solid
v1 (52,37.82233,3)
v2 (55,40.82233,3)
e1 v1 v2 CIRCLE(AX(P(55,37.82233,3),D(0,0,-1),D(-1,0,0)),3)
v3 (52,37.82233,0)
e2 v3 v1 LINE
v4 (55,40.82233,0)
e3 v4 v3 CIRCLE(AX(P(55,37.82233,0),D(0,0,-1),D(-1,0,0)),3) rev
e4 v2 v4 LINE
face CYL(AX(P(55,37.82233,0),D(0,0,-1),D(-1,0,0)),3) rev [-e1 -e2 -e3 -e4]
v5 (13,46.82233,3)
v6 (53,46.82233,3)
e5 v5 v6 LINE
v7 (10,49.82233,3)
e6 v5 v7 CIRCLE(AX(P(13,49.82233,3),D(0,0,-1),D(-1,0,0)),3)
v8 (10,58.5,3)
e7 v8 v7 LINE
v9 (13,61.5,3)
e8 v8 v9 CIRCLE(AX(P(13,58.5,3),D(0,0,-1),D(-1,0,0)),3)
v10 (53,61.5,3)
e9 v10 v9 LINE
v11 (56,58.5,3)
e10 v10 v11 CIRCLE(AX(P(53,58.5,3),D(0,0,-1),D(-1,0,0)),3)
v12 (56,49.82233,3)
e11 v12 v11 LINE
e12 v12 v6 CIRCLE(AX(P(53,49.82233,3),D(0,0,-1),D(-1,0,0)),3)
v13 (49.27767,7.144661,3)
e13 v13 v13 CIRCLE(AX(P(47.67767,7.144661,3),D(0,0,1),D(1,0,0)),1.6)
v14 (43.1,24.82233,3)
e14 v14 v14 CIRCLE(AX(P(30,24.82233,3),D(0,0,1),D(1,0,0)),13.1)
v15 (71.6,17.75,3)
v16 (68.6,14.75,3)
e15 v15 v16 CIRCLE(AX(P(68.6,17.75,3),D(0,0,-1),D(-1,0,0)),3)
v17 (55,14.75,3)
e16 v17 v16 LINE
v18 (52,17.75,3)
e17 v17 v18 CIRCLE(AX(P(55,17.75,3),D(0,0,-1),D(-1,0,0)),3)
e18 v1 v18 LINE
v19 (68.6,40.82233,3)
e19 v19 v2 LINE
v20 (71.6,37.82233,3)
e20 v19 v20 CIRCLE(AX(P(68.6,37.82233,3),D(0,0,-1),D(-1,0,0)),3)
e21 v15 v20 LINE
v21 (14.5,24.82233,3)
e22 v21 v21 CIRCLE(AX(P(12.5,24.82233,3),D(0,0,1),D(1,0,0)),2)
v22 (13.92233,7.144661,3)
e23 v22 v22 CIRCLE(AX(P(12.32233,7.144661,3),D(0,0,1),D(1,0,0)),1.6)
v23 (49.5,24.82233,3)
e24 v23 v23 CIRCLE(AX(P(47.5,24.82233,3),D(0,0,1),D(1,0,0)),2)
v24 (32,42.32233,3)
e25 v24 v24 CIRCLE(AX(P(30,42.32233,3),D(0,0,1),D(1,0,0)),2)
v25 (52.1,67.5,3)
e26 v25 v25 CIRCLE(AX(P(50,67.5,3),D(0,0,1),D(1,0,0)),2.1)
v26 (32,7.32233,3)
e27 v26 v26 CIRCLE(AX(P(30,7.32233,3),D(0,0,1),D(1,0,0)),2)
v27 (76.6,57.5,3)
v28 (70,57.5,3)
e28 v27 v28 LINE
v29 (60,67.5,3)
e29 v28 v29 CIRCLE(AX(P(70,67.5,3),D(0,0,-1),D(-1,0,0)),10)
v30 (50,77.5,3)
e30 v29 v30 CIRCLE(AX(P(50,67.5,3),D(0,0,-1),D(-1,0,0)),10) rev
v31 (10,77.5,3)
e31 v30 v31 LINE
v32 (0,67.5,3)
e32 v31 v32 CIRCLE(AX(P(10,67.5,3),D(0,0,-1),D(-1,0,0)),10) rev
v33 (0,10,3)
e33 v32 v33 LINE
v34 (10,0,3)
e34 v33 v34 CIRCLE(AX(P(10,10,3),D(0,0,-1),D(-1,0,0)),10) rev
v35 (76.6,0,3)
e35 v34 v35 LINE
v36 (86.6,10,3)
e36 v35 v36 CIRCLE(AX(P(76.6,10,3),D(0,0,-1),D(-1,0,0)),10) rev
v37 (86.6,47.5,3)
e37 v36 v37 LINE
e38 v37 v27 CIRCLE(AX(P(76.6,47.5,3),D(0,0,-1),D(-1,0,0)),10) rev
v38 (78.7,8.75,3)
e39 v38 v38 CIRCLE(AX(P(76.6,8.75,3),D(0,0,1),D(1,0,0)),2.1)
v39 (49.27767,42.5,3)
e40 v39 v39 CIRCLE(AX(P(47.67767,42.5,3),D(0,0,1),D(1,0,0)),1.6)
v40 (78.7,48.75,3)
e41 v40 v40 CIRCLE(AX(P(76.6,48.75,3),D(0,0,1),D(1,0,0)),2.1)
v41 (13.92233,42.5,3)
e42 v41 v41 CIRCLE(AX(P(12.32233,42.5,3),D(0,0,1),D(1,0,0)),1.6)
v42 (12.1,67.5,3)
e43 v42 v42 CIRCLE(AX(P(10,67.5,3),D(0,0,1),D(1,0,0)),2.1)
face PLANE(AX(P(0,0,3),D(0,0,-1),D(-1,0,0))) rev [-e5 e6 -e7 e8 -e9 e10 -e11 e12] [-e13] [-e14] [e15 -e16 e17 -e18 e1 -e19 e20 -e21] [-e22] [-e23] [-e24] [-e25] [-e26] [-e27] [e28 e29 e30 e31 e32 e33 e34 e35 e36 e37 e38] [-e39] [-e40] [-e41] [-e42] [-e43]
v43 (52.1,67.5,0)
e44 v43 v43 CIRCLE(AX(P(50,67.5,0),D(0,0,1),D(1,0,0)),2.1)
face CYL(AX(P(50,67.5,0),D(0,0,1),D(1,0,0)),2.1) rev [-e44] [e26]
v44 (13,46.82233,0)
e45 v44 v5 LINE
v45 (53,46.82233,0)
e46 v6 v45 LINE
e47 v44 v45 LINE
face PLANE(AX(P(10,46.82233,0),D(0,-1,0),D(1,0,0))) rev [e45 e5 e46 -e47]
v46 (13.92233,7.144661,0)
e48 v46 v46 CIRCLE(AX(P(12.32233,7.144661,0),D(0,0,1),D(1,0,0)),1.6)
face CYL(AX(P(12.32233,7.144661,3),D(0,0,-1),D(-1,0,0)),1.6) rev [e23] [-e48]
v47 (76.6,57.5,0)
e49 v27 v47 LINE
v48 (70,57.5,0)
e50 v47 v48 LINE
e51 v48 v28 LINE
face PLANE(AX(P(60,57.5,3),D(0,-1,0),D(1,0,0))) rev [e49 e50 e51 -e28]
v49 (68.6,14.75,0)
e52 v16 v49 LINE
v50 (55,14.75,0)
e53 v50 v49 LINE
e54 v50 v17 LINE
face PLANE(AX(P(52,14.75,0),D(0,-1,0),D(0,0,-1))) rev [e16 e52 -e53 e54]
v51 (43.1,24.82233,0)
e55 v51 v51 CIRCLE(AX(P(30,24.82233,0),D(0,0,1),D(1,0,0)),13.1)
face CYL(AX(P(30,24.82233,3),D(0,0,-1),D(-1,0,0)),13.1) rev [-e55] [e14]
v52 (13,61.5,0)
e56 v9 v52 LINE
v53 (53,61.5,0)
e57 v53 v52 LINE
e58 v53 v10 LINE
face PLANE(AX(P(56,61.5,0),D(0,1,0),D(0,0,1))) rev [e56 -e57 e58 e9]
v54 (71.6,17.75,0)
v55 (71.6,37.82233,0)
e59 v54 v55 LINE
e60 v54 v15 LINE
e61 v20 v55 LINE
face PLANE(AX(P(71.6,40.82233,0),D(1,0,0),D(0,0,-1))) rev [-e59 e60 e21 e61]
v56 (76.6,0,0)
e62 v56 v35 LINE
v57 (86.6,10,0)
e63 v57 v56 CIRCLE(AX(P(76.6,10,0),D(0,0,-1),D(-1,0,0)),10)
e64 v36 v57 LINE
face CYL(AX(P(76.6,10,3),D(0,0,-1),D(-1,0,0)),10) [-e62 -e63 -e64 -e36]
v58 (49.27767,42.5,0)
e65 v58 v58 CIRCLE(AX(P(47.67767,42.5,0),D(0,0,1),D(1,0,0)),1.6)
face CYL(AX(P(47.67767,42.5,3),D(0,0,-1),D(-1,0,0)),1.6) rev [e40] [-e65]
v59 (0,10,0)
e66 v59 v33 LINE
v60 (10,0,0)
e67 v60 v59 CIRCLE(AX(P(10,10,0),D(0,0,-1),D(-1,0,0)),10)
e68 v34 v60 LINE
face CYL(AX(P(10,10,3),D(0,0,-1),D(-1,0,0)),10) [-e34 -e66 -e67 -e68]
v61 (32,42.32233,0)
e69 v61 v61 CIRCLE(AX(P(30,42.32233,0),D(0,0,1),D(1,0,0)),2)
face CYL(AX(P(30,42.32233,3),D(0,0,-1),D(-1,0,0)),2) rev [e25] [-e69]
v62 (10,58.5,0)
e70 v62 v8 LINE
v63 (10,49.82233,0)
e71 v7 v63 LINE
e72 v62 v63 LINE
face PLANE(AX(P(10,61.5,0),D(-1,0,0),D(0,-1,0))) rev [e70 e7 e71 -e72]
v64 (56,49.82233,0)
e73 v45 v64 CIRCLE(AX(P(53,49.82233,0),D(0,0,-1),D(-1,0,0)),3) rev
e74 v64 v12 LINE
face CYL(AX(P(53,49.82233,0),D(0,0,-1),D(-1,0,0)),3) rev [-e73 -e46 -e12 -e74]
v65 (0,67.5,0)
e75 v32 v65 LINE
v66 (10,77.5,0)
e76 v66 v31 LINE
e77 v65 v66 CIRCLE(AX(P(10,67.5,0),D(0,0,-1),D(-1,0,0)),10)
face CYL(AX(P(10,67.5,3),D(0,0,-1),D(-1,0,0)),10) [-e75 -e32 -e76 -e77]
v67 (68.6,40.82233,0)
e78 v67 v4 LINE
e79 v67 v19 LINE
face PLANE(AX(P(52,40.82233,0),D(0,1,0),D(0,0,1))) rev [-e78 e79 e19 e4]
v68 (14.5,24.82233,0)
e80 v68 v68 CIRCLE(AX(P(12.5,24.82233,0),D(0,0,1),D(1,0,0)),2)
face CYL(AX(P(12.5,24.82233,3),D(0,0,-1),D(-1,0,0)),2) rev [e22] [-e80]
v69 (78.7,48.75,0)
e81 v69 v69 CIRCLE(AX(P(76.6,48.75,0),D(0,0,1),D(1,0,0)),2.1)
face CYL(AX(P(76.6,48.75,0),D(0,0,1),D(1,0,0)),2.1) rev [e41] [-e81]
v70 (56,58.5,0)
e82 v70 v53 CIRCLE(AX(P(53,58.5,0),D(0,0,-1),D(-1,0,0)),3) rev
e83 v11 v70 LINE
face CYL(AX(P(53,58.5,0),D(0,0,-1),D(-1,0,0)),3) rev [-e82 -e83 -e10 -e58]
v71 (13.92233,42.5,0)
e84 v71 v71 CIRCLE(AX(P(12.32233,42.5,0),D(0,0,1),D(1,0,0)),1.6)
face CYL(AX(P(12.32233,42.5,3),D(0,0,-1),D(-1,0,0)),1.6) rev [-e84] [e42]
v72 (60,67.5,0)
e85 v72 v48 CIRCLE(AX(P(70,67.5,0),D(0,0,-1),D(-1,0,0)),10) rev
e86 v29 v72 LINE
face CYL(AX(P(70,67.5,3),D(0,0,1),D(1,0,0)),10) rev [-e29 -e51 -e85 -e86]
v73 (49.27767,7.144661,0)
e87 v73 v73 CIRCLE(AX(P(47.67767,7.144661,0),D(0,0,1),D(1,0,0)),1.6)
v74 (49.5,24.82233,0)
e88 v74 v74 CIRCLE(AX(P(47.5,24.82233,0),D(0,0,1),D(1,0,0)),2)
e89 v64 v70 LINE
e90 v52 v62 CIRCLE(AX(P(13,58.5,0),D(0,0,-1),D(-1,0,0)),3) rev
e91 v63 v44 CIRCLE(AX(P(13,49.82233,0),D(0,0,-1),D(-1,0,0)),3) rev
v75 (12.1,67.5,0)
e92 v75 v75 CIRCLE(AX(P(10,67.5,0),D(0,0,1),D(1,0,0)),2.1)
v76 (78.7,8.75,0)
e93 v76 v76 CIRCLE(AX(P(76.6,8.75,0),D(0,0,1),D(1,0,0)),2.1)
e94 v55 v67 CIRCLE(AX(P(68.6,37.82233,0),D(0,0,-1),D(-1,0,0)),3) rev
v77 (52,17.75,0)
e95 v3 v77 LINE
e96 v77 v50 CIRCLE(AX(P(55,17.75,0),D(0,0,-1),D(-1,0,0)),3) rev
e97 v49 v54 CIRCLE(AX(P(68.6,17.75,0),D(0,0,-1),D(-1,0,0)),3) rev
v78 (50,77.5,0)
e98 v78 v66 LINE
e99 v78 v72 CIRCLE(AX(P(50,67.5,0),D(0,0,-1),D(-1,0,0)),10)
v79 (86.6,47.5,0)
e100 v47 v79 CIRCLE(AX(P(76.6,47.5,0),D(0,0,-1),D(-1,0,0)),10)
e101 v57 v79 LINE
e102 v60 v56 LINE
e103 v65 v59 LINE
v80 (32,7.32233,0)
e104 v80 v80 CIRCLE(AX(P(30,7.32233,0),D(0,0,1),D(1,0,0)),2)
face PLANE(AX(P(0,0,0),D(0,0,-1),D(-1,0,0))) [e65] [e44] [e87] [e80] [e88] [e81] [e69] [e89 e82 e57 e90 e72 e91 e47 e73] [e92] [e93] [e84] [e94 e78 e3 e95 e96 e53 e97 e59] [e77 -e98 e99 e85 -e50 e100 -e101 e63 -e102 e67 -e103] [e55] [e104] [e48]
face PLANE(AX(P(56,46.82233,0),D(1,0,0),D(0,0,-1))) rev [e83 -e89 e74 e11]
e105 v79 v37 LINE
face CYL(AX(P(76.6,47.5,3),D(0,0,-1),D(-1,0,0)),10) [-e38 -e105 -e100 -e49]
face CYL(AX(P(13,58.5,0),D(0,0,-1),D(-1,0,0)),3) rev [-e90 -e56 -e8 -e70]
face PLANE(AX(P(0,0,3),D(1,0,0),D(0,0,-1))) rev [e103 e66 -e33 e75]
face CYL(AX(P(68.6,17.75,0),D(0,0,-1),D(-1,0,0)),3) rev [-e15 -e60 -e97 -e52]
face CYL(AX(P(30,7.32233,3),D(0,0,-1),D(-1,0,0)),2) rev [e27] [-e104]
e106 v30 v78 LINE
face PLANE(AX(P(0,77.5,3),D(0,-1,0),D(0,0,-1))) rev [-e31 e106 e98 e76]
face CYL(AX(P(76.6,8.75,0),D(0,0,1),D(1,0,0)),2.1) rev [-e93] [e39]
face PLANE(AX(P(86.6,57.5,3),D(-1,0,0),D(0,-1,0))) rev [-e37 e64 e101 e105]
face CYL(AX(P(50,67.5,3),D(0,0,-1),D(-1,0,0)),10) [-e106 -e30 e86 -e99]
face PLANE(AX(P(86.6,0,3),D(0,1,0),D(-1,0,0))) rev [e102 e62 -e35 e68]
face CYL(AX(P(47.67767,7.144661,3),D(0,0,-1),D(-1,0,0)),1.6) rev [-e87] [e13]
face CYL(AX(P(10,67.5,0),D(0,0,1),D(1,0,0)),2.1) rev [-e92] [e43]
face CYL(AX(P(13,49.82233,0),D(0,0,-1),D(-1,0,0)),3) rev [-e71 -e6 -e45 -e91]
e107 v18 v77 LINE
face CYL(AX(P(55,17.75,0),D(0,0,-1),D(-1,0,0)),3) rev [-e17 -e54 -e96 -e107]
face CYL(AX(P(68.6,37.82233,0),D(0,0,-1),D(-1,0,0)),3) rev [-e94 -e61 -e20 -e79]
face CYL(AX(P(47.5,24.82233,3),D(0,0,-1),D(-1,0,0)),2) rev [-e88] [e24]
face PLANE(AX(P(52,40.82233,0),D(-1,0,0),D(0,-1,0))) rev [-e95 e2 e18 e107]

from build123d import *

# Parameters (mm, degrees)
SKETCH_1_R          = 1.6
SKETCH_1_R_2        = 2
SKETCH_1_R_3        = 13.1
EXTRUDE_1_DEPTH     = 3
SKETCH_2_R          = 2.1
CUT_EXTRUDE_1_DEPTH = 117.253215009
FILLET_1_R          = 10
SKETCH_4_W          = 19.6
SKETCH_4_H          = 26.07233047
SKETCH_4_W_2        = 46
SKETCH_4_H_2        = 14.67766953
CUT_EXTRUDE_2_DEPTH = 117.253215009
FILLET_2_R          = 3


with BuildPart() as part:
    # 草图1 → 凸台-拉伸1 (new body)
    with BuildSketch(Plane.XY):
        Polygon((0, 0), (0, 77.5), (60, 77.5), (60, 57.5), (86.6, 57.5), (86.6, 0), align=None)
        with Locations((12.32233047, 42.5)):
            Circle(SKETCH_1_R, mode=Mode.SUBTRACT)
        with Locations((30, 42.32233047)):
            Circle(SKETCH_1_R_2, mode=Mode.SUBTRACT)
        with Locations((30, 24.82233047)):
            Circle(SKETCH_1_R_3, mode=Mode.SUBTRACT)
        with Locations((12.5, 24.82233047)):
            Circle(SKETCH_1_R_2, mode=Mode.SUBTRACT)
        with Locations((12.32233047, 7.144660941)):
            Circle(SKETCH_1_R, mode=Mode.SUBTRACT)
        with Locations((30, 7.32233047)):
            Circle(SKETCH_1_R_2, mode=Mode.SUBTRACT)
        with Locations((47.67766953, 7.144660941)):
            Circle(SKETCH_1_R, mode=Mode.SUBTRACT)
        with Locations((47.5, 24.82233047)):
            Circle(SKETCH_1_R_2, mode=Mode.SUBTRACT)
        with Locations((47.67766953, 42.5)):
            Circle(SKETCH_1_R, mode=Mode.SUBTRACT)
    extrude(amount=EXTRUDE_1_DEPTH)

    # 草图2 → 切除-拉伸1 (cut, through all)
    with BuildSketch(Plane.XY.offset(3)):
        with Locations((10, 67.5)):
            Circle(SKETCH_2_R)
        with Locations((50, 67.5)):
            Circle(SKETCH_2_R)
        with Locations((76.6, 48.75)):
            Circle(SKETCH_2_R)
        with Locations((76.6, 8.75)):
            Circle(SKETCH_2_R)
    extrude(amount=-CUT_EXTRUDE_1_DEPTH, mode=Mode.SUBTRACT)

    # 圆角1
    fillet_1_edges = [part.edges().sort_by_distance(p)[0] for p in [
        (0, 77.5, 1.5),
        (0, 0, 1.5),
        (86.6, 0, 1.5),
        (86.6, 57.5, 1.5),
        (60, 77.5, 1.5),
        (60, 57.5, 1.5),
    ]]
    fillet(fillet_1_edges, radius=FILLET_1_R - 0.0001)  # a hair under: the kernel refuses the full size

    # 草图4 → 切除-拉伸2 (cut, through all)
    with BuildSketch(Plane.XY.offset(3)):
        with Locations((61.8, 27.786165235)):
            Rectangle(SKETCH_4_W, SKETCH_4_H)
        with Locations((33, 54.161165235)):
            Rectangle(SKETCH_4_W_2, SKETCH_4_H_2)
    extrude(amount=-CUT_EXTRUDE_2_DEPTH, mode=Mode.SUBTRACT)

    # 圆角2
    fillet_2_edges = [part.edges().sort_by_distance(p)[0] for p in [
        (56, 46.82233047, 1.5),
        (10, 46.82233047, 1.5),
        (10, 61.5, 1.5),
        (56, 61.5, 1.5),
        (52, 14.75, 1.5),
        (52, 40.82233047, 1.5),
        (71.6, 40.82233047, 1.5),
        (71.6, 14.75, 1.5),
    ]]
    fillet(fillet_2_edges, radius=FILLET_2_R)


solid = part.part
